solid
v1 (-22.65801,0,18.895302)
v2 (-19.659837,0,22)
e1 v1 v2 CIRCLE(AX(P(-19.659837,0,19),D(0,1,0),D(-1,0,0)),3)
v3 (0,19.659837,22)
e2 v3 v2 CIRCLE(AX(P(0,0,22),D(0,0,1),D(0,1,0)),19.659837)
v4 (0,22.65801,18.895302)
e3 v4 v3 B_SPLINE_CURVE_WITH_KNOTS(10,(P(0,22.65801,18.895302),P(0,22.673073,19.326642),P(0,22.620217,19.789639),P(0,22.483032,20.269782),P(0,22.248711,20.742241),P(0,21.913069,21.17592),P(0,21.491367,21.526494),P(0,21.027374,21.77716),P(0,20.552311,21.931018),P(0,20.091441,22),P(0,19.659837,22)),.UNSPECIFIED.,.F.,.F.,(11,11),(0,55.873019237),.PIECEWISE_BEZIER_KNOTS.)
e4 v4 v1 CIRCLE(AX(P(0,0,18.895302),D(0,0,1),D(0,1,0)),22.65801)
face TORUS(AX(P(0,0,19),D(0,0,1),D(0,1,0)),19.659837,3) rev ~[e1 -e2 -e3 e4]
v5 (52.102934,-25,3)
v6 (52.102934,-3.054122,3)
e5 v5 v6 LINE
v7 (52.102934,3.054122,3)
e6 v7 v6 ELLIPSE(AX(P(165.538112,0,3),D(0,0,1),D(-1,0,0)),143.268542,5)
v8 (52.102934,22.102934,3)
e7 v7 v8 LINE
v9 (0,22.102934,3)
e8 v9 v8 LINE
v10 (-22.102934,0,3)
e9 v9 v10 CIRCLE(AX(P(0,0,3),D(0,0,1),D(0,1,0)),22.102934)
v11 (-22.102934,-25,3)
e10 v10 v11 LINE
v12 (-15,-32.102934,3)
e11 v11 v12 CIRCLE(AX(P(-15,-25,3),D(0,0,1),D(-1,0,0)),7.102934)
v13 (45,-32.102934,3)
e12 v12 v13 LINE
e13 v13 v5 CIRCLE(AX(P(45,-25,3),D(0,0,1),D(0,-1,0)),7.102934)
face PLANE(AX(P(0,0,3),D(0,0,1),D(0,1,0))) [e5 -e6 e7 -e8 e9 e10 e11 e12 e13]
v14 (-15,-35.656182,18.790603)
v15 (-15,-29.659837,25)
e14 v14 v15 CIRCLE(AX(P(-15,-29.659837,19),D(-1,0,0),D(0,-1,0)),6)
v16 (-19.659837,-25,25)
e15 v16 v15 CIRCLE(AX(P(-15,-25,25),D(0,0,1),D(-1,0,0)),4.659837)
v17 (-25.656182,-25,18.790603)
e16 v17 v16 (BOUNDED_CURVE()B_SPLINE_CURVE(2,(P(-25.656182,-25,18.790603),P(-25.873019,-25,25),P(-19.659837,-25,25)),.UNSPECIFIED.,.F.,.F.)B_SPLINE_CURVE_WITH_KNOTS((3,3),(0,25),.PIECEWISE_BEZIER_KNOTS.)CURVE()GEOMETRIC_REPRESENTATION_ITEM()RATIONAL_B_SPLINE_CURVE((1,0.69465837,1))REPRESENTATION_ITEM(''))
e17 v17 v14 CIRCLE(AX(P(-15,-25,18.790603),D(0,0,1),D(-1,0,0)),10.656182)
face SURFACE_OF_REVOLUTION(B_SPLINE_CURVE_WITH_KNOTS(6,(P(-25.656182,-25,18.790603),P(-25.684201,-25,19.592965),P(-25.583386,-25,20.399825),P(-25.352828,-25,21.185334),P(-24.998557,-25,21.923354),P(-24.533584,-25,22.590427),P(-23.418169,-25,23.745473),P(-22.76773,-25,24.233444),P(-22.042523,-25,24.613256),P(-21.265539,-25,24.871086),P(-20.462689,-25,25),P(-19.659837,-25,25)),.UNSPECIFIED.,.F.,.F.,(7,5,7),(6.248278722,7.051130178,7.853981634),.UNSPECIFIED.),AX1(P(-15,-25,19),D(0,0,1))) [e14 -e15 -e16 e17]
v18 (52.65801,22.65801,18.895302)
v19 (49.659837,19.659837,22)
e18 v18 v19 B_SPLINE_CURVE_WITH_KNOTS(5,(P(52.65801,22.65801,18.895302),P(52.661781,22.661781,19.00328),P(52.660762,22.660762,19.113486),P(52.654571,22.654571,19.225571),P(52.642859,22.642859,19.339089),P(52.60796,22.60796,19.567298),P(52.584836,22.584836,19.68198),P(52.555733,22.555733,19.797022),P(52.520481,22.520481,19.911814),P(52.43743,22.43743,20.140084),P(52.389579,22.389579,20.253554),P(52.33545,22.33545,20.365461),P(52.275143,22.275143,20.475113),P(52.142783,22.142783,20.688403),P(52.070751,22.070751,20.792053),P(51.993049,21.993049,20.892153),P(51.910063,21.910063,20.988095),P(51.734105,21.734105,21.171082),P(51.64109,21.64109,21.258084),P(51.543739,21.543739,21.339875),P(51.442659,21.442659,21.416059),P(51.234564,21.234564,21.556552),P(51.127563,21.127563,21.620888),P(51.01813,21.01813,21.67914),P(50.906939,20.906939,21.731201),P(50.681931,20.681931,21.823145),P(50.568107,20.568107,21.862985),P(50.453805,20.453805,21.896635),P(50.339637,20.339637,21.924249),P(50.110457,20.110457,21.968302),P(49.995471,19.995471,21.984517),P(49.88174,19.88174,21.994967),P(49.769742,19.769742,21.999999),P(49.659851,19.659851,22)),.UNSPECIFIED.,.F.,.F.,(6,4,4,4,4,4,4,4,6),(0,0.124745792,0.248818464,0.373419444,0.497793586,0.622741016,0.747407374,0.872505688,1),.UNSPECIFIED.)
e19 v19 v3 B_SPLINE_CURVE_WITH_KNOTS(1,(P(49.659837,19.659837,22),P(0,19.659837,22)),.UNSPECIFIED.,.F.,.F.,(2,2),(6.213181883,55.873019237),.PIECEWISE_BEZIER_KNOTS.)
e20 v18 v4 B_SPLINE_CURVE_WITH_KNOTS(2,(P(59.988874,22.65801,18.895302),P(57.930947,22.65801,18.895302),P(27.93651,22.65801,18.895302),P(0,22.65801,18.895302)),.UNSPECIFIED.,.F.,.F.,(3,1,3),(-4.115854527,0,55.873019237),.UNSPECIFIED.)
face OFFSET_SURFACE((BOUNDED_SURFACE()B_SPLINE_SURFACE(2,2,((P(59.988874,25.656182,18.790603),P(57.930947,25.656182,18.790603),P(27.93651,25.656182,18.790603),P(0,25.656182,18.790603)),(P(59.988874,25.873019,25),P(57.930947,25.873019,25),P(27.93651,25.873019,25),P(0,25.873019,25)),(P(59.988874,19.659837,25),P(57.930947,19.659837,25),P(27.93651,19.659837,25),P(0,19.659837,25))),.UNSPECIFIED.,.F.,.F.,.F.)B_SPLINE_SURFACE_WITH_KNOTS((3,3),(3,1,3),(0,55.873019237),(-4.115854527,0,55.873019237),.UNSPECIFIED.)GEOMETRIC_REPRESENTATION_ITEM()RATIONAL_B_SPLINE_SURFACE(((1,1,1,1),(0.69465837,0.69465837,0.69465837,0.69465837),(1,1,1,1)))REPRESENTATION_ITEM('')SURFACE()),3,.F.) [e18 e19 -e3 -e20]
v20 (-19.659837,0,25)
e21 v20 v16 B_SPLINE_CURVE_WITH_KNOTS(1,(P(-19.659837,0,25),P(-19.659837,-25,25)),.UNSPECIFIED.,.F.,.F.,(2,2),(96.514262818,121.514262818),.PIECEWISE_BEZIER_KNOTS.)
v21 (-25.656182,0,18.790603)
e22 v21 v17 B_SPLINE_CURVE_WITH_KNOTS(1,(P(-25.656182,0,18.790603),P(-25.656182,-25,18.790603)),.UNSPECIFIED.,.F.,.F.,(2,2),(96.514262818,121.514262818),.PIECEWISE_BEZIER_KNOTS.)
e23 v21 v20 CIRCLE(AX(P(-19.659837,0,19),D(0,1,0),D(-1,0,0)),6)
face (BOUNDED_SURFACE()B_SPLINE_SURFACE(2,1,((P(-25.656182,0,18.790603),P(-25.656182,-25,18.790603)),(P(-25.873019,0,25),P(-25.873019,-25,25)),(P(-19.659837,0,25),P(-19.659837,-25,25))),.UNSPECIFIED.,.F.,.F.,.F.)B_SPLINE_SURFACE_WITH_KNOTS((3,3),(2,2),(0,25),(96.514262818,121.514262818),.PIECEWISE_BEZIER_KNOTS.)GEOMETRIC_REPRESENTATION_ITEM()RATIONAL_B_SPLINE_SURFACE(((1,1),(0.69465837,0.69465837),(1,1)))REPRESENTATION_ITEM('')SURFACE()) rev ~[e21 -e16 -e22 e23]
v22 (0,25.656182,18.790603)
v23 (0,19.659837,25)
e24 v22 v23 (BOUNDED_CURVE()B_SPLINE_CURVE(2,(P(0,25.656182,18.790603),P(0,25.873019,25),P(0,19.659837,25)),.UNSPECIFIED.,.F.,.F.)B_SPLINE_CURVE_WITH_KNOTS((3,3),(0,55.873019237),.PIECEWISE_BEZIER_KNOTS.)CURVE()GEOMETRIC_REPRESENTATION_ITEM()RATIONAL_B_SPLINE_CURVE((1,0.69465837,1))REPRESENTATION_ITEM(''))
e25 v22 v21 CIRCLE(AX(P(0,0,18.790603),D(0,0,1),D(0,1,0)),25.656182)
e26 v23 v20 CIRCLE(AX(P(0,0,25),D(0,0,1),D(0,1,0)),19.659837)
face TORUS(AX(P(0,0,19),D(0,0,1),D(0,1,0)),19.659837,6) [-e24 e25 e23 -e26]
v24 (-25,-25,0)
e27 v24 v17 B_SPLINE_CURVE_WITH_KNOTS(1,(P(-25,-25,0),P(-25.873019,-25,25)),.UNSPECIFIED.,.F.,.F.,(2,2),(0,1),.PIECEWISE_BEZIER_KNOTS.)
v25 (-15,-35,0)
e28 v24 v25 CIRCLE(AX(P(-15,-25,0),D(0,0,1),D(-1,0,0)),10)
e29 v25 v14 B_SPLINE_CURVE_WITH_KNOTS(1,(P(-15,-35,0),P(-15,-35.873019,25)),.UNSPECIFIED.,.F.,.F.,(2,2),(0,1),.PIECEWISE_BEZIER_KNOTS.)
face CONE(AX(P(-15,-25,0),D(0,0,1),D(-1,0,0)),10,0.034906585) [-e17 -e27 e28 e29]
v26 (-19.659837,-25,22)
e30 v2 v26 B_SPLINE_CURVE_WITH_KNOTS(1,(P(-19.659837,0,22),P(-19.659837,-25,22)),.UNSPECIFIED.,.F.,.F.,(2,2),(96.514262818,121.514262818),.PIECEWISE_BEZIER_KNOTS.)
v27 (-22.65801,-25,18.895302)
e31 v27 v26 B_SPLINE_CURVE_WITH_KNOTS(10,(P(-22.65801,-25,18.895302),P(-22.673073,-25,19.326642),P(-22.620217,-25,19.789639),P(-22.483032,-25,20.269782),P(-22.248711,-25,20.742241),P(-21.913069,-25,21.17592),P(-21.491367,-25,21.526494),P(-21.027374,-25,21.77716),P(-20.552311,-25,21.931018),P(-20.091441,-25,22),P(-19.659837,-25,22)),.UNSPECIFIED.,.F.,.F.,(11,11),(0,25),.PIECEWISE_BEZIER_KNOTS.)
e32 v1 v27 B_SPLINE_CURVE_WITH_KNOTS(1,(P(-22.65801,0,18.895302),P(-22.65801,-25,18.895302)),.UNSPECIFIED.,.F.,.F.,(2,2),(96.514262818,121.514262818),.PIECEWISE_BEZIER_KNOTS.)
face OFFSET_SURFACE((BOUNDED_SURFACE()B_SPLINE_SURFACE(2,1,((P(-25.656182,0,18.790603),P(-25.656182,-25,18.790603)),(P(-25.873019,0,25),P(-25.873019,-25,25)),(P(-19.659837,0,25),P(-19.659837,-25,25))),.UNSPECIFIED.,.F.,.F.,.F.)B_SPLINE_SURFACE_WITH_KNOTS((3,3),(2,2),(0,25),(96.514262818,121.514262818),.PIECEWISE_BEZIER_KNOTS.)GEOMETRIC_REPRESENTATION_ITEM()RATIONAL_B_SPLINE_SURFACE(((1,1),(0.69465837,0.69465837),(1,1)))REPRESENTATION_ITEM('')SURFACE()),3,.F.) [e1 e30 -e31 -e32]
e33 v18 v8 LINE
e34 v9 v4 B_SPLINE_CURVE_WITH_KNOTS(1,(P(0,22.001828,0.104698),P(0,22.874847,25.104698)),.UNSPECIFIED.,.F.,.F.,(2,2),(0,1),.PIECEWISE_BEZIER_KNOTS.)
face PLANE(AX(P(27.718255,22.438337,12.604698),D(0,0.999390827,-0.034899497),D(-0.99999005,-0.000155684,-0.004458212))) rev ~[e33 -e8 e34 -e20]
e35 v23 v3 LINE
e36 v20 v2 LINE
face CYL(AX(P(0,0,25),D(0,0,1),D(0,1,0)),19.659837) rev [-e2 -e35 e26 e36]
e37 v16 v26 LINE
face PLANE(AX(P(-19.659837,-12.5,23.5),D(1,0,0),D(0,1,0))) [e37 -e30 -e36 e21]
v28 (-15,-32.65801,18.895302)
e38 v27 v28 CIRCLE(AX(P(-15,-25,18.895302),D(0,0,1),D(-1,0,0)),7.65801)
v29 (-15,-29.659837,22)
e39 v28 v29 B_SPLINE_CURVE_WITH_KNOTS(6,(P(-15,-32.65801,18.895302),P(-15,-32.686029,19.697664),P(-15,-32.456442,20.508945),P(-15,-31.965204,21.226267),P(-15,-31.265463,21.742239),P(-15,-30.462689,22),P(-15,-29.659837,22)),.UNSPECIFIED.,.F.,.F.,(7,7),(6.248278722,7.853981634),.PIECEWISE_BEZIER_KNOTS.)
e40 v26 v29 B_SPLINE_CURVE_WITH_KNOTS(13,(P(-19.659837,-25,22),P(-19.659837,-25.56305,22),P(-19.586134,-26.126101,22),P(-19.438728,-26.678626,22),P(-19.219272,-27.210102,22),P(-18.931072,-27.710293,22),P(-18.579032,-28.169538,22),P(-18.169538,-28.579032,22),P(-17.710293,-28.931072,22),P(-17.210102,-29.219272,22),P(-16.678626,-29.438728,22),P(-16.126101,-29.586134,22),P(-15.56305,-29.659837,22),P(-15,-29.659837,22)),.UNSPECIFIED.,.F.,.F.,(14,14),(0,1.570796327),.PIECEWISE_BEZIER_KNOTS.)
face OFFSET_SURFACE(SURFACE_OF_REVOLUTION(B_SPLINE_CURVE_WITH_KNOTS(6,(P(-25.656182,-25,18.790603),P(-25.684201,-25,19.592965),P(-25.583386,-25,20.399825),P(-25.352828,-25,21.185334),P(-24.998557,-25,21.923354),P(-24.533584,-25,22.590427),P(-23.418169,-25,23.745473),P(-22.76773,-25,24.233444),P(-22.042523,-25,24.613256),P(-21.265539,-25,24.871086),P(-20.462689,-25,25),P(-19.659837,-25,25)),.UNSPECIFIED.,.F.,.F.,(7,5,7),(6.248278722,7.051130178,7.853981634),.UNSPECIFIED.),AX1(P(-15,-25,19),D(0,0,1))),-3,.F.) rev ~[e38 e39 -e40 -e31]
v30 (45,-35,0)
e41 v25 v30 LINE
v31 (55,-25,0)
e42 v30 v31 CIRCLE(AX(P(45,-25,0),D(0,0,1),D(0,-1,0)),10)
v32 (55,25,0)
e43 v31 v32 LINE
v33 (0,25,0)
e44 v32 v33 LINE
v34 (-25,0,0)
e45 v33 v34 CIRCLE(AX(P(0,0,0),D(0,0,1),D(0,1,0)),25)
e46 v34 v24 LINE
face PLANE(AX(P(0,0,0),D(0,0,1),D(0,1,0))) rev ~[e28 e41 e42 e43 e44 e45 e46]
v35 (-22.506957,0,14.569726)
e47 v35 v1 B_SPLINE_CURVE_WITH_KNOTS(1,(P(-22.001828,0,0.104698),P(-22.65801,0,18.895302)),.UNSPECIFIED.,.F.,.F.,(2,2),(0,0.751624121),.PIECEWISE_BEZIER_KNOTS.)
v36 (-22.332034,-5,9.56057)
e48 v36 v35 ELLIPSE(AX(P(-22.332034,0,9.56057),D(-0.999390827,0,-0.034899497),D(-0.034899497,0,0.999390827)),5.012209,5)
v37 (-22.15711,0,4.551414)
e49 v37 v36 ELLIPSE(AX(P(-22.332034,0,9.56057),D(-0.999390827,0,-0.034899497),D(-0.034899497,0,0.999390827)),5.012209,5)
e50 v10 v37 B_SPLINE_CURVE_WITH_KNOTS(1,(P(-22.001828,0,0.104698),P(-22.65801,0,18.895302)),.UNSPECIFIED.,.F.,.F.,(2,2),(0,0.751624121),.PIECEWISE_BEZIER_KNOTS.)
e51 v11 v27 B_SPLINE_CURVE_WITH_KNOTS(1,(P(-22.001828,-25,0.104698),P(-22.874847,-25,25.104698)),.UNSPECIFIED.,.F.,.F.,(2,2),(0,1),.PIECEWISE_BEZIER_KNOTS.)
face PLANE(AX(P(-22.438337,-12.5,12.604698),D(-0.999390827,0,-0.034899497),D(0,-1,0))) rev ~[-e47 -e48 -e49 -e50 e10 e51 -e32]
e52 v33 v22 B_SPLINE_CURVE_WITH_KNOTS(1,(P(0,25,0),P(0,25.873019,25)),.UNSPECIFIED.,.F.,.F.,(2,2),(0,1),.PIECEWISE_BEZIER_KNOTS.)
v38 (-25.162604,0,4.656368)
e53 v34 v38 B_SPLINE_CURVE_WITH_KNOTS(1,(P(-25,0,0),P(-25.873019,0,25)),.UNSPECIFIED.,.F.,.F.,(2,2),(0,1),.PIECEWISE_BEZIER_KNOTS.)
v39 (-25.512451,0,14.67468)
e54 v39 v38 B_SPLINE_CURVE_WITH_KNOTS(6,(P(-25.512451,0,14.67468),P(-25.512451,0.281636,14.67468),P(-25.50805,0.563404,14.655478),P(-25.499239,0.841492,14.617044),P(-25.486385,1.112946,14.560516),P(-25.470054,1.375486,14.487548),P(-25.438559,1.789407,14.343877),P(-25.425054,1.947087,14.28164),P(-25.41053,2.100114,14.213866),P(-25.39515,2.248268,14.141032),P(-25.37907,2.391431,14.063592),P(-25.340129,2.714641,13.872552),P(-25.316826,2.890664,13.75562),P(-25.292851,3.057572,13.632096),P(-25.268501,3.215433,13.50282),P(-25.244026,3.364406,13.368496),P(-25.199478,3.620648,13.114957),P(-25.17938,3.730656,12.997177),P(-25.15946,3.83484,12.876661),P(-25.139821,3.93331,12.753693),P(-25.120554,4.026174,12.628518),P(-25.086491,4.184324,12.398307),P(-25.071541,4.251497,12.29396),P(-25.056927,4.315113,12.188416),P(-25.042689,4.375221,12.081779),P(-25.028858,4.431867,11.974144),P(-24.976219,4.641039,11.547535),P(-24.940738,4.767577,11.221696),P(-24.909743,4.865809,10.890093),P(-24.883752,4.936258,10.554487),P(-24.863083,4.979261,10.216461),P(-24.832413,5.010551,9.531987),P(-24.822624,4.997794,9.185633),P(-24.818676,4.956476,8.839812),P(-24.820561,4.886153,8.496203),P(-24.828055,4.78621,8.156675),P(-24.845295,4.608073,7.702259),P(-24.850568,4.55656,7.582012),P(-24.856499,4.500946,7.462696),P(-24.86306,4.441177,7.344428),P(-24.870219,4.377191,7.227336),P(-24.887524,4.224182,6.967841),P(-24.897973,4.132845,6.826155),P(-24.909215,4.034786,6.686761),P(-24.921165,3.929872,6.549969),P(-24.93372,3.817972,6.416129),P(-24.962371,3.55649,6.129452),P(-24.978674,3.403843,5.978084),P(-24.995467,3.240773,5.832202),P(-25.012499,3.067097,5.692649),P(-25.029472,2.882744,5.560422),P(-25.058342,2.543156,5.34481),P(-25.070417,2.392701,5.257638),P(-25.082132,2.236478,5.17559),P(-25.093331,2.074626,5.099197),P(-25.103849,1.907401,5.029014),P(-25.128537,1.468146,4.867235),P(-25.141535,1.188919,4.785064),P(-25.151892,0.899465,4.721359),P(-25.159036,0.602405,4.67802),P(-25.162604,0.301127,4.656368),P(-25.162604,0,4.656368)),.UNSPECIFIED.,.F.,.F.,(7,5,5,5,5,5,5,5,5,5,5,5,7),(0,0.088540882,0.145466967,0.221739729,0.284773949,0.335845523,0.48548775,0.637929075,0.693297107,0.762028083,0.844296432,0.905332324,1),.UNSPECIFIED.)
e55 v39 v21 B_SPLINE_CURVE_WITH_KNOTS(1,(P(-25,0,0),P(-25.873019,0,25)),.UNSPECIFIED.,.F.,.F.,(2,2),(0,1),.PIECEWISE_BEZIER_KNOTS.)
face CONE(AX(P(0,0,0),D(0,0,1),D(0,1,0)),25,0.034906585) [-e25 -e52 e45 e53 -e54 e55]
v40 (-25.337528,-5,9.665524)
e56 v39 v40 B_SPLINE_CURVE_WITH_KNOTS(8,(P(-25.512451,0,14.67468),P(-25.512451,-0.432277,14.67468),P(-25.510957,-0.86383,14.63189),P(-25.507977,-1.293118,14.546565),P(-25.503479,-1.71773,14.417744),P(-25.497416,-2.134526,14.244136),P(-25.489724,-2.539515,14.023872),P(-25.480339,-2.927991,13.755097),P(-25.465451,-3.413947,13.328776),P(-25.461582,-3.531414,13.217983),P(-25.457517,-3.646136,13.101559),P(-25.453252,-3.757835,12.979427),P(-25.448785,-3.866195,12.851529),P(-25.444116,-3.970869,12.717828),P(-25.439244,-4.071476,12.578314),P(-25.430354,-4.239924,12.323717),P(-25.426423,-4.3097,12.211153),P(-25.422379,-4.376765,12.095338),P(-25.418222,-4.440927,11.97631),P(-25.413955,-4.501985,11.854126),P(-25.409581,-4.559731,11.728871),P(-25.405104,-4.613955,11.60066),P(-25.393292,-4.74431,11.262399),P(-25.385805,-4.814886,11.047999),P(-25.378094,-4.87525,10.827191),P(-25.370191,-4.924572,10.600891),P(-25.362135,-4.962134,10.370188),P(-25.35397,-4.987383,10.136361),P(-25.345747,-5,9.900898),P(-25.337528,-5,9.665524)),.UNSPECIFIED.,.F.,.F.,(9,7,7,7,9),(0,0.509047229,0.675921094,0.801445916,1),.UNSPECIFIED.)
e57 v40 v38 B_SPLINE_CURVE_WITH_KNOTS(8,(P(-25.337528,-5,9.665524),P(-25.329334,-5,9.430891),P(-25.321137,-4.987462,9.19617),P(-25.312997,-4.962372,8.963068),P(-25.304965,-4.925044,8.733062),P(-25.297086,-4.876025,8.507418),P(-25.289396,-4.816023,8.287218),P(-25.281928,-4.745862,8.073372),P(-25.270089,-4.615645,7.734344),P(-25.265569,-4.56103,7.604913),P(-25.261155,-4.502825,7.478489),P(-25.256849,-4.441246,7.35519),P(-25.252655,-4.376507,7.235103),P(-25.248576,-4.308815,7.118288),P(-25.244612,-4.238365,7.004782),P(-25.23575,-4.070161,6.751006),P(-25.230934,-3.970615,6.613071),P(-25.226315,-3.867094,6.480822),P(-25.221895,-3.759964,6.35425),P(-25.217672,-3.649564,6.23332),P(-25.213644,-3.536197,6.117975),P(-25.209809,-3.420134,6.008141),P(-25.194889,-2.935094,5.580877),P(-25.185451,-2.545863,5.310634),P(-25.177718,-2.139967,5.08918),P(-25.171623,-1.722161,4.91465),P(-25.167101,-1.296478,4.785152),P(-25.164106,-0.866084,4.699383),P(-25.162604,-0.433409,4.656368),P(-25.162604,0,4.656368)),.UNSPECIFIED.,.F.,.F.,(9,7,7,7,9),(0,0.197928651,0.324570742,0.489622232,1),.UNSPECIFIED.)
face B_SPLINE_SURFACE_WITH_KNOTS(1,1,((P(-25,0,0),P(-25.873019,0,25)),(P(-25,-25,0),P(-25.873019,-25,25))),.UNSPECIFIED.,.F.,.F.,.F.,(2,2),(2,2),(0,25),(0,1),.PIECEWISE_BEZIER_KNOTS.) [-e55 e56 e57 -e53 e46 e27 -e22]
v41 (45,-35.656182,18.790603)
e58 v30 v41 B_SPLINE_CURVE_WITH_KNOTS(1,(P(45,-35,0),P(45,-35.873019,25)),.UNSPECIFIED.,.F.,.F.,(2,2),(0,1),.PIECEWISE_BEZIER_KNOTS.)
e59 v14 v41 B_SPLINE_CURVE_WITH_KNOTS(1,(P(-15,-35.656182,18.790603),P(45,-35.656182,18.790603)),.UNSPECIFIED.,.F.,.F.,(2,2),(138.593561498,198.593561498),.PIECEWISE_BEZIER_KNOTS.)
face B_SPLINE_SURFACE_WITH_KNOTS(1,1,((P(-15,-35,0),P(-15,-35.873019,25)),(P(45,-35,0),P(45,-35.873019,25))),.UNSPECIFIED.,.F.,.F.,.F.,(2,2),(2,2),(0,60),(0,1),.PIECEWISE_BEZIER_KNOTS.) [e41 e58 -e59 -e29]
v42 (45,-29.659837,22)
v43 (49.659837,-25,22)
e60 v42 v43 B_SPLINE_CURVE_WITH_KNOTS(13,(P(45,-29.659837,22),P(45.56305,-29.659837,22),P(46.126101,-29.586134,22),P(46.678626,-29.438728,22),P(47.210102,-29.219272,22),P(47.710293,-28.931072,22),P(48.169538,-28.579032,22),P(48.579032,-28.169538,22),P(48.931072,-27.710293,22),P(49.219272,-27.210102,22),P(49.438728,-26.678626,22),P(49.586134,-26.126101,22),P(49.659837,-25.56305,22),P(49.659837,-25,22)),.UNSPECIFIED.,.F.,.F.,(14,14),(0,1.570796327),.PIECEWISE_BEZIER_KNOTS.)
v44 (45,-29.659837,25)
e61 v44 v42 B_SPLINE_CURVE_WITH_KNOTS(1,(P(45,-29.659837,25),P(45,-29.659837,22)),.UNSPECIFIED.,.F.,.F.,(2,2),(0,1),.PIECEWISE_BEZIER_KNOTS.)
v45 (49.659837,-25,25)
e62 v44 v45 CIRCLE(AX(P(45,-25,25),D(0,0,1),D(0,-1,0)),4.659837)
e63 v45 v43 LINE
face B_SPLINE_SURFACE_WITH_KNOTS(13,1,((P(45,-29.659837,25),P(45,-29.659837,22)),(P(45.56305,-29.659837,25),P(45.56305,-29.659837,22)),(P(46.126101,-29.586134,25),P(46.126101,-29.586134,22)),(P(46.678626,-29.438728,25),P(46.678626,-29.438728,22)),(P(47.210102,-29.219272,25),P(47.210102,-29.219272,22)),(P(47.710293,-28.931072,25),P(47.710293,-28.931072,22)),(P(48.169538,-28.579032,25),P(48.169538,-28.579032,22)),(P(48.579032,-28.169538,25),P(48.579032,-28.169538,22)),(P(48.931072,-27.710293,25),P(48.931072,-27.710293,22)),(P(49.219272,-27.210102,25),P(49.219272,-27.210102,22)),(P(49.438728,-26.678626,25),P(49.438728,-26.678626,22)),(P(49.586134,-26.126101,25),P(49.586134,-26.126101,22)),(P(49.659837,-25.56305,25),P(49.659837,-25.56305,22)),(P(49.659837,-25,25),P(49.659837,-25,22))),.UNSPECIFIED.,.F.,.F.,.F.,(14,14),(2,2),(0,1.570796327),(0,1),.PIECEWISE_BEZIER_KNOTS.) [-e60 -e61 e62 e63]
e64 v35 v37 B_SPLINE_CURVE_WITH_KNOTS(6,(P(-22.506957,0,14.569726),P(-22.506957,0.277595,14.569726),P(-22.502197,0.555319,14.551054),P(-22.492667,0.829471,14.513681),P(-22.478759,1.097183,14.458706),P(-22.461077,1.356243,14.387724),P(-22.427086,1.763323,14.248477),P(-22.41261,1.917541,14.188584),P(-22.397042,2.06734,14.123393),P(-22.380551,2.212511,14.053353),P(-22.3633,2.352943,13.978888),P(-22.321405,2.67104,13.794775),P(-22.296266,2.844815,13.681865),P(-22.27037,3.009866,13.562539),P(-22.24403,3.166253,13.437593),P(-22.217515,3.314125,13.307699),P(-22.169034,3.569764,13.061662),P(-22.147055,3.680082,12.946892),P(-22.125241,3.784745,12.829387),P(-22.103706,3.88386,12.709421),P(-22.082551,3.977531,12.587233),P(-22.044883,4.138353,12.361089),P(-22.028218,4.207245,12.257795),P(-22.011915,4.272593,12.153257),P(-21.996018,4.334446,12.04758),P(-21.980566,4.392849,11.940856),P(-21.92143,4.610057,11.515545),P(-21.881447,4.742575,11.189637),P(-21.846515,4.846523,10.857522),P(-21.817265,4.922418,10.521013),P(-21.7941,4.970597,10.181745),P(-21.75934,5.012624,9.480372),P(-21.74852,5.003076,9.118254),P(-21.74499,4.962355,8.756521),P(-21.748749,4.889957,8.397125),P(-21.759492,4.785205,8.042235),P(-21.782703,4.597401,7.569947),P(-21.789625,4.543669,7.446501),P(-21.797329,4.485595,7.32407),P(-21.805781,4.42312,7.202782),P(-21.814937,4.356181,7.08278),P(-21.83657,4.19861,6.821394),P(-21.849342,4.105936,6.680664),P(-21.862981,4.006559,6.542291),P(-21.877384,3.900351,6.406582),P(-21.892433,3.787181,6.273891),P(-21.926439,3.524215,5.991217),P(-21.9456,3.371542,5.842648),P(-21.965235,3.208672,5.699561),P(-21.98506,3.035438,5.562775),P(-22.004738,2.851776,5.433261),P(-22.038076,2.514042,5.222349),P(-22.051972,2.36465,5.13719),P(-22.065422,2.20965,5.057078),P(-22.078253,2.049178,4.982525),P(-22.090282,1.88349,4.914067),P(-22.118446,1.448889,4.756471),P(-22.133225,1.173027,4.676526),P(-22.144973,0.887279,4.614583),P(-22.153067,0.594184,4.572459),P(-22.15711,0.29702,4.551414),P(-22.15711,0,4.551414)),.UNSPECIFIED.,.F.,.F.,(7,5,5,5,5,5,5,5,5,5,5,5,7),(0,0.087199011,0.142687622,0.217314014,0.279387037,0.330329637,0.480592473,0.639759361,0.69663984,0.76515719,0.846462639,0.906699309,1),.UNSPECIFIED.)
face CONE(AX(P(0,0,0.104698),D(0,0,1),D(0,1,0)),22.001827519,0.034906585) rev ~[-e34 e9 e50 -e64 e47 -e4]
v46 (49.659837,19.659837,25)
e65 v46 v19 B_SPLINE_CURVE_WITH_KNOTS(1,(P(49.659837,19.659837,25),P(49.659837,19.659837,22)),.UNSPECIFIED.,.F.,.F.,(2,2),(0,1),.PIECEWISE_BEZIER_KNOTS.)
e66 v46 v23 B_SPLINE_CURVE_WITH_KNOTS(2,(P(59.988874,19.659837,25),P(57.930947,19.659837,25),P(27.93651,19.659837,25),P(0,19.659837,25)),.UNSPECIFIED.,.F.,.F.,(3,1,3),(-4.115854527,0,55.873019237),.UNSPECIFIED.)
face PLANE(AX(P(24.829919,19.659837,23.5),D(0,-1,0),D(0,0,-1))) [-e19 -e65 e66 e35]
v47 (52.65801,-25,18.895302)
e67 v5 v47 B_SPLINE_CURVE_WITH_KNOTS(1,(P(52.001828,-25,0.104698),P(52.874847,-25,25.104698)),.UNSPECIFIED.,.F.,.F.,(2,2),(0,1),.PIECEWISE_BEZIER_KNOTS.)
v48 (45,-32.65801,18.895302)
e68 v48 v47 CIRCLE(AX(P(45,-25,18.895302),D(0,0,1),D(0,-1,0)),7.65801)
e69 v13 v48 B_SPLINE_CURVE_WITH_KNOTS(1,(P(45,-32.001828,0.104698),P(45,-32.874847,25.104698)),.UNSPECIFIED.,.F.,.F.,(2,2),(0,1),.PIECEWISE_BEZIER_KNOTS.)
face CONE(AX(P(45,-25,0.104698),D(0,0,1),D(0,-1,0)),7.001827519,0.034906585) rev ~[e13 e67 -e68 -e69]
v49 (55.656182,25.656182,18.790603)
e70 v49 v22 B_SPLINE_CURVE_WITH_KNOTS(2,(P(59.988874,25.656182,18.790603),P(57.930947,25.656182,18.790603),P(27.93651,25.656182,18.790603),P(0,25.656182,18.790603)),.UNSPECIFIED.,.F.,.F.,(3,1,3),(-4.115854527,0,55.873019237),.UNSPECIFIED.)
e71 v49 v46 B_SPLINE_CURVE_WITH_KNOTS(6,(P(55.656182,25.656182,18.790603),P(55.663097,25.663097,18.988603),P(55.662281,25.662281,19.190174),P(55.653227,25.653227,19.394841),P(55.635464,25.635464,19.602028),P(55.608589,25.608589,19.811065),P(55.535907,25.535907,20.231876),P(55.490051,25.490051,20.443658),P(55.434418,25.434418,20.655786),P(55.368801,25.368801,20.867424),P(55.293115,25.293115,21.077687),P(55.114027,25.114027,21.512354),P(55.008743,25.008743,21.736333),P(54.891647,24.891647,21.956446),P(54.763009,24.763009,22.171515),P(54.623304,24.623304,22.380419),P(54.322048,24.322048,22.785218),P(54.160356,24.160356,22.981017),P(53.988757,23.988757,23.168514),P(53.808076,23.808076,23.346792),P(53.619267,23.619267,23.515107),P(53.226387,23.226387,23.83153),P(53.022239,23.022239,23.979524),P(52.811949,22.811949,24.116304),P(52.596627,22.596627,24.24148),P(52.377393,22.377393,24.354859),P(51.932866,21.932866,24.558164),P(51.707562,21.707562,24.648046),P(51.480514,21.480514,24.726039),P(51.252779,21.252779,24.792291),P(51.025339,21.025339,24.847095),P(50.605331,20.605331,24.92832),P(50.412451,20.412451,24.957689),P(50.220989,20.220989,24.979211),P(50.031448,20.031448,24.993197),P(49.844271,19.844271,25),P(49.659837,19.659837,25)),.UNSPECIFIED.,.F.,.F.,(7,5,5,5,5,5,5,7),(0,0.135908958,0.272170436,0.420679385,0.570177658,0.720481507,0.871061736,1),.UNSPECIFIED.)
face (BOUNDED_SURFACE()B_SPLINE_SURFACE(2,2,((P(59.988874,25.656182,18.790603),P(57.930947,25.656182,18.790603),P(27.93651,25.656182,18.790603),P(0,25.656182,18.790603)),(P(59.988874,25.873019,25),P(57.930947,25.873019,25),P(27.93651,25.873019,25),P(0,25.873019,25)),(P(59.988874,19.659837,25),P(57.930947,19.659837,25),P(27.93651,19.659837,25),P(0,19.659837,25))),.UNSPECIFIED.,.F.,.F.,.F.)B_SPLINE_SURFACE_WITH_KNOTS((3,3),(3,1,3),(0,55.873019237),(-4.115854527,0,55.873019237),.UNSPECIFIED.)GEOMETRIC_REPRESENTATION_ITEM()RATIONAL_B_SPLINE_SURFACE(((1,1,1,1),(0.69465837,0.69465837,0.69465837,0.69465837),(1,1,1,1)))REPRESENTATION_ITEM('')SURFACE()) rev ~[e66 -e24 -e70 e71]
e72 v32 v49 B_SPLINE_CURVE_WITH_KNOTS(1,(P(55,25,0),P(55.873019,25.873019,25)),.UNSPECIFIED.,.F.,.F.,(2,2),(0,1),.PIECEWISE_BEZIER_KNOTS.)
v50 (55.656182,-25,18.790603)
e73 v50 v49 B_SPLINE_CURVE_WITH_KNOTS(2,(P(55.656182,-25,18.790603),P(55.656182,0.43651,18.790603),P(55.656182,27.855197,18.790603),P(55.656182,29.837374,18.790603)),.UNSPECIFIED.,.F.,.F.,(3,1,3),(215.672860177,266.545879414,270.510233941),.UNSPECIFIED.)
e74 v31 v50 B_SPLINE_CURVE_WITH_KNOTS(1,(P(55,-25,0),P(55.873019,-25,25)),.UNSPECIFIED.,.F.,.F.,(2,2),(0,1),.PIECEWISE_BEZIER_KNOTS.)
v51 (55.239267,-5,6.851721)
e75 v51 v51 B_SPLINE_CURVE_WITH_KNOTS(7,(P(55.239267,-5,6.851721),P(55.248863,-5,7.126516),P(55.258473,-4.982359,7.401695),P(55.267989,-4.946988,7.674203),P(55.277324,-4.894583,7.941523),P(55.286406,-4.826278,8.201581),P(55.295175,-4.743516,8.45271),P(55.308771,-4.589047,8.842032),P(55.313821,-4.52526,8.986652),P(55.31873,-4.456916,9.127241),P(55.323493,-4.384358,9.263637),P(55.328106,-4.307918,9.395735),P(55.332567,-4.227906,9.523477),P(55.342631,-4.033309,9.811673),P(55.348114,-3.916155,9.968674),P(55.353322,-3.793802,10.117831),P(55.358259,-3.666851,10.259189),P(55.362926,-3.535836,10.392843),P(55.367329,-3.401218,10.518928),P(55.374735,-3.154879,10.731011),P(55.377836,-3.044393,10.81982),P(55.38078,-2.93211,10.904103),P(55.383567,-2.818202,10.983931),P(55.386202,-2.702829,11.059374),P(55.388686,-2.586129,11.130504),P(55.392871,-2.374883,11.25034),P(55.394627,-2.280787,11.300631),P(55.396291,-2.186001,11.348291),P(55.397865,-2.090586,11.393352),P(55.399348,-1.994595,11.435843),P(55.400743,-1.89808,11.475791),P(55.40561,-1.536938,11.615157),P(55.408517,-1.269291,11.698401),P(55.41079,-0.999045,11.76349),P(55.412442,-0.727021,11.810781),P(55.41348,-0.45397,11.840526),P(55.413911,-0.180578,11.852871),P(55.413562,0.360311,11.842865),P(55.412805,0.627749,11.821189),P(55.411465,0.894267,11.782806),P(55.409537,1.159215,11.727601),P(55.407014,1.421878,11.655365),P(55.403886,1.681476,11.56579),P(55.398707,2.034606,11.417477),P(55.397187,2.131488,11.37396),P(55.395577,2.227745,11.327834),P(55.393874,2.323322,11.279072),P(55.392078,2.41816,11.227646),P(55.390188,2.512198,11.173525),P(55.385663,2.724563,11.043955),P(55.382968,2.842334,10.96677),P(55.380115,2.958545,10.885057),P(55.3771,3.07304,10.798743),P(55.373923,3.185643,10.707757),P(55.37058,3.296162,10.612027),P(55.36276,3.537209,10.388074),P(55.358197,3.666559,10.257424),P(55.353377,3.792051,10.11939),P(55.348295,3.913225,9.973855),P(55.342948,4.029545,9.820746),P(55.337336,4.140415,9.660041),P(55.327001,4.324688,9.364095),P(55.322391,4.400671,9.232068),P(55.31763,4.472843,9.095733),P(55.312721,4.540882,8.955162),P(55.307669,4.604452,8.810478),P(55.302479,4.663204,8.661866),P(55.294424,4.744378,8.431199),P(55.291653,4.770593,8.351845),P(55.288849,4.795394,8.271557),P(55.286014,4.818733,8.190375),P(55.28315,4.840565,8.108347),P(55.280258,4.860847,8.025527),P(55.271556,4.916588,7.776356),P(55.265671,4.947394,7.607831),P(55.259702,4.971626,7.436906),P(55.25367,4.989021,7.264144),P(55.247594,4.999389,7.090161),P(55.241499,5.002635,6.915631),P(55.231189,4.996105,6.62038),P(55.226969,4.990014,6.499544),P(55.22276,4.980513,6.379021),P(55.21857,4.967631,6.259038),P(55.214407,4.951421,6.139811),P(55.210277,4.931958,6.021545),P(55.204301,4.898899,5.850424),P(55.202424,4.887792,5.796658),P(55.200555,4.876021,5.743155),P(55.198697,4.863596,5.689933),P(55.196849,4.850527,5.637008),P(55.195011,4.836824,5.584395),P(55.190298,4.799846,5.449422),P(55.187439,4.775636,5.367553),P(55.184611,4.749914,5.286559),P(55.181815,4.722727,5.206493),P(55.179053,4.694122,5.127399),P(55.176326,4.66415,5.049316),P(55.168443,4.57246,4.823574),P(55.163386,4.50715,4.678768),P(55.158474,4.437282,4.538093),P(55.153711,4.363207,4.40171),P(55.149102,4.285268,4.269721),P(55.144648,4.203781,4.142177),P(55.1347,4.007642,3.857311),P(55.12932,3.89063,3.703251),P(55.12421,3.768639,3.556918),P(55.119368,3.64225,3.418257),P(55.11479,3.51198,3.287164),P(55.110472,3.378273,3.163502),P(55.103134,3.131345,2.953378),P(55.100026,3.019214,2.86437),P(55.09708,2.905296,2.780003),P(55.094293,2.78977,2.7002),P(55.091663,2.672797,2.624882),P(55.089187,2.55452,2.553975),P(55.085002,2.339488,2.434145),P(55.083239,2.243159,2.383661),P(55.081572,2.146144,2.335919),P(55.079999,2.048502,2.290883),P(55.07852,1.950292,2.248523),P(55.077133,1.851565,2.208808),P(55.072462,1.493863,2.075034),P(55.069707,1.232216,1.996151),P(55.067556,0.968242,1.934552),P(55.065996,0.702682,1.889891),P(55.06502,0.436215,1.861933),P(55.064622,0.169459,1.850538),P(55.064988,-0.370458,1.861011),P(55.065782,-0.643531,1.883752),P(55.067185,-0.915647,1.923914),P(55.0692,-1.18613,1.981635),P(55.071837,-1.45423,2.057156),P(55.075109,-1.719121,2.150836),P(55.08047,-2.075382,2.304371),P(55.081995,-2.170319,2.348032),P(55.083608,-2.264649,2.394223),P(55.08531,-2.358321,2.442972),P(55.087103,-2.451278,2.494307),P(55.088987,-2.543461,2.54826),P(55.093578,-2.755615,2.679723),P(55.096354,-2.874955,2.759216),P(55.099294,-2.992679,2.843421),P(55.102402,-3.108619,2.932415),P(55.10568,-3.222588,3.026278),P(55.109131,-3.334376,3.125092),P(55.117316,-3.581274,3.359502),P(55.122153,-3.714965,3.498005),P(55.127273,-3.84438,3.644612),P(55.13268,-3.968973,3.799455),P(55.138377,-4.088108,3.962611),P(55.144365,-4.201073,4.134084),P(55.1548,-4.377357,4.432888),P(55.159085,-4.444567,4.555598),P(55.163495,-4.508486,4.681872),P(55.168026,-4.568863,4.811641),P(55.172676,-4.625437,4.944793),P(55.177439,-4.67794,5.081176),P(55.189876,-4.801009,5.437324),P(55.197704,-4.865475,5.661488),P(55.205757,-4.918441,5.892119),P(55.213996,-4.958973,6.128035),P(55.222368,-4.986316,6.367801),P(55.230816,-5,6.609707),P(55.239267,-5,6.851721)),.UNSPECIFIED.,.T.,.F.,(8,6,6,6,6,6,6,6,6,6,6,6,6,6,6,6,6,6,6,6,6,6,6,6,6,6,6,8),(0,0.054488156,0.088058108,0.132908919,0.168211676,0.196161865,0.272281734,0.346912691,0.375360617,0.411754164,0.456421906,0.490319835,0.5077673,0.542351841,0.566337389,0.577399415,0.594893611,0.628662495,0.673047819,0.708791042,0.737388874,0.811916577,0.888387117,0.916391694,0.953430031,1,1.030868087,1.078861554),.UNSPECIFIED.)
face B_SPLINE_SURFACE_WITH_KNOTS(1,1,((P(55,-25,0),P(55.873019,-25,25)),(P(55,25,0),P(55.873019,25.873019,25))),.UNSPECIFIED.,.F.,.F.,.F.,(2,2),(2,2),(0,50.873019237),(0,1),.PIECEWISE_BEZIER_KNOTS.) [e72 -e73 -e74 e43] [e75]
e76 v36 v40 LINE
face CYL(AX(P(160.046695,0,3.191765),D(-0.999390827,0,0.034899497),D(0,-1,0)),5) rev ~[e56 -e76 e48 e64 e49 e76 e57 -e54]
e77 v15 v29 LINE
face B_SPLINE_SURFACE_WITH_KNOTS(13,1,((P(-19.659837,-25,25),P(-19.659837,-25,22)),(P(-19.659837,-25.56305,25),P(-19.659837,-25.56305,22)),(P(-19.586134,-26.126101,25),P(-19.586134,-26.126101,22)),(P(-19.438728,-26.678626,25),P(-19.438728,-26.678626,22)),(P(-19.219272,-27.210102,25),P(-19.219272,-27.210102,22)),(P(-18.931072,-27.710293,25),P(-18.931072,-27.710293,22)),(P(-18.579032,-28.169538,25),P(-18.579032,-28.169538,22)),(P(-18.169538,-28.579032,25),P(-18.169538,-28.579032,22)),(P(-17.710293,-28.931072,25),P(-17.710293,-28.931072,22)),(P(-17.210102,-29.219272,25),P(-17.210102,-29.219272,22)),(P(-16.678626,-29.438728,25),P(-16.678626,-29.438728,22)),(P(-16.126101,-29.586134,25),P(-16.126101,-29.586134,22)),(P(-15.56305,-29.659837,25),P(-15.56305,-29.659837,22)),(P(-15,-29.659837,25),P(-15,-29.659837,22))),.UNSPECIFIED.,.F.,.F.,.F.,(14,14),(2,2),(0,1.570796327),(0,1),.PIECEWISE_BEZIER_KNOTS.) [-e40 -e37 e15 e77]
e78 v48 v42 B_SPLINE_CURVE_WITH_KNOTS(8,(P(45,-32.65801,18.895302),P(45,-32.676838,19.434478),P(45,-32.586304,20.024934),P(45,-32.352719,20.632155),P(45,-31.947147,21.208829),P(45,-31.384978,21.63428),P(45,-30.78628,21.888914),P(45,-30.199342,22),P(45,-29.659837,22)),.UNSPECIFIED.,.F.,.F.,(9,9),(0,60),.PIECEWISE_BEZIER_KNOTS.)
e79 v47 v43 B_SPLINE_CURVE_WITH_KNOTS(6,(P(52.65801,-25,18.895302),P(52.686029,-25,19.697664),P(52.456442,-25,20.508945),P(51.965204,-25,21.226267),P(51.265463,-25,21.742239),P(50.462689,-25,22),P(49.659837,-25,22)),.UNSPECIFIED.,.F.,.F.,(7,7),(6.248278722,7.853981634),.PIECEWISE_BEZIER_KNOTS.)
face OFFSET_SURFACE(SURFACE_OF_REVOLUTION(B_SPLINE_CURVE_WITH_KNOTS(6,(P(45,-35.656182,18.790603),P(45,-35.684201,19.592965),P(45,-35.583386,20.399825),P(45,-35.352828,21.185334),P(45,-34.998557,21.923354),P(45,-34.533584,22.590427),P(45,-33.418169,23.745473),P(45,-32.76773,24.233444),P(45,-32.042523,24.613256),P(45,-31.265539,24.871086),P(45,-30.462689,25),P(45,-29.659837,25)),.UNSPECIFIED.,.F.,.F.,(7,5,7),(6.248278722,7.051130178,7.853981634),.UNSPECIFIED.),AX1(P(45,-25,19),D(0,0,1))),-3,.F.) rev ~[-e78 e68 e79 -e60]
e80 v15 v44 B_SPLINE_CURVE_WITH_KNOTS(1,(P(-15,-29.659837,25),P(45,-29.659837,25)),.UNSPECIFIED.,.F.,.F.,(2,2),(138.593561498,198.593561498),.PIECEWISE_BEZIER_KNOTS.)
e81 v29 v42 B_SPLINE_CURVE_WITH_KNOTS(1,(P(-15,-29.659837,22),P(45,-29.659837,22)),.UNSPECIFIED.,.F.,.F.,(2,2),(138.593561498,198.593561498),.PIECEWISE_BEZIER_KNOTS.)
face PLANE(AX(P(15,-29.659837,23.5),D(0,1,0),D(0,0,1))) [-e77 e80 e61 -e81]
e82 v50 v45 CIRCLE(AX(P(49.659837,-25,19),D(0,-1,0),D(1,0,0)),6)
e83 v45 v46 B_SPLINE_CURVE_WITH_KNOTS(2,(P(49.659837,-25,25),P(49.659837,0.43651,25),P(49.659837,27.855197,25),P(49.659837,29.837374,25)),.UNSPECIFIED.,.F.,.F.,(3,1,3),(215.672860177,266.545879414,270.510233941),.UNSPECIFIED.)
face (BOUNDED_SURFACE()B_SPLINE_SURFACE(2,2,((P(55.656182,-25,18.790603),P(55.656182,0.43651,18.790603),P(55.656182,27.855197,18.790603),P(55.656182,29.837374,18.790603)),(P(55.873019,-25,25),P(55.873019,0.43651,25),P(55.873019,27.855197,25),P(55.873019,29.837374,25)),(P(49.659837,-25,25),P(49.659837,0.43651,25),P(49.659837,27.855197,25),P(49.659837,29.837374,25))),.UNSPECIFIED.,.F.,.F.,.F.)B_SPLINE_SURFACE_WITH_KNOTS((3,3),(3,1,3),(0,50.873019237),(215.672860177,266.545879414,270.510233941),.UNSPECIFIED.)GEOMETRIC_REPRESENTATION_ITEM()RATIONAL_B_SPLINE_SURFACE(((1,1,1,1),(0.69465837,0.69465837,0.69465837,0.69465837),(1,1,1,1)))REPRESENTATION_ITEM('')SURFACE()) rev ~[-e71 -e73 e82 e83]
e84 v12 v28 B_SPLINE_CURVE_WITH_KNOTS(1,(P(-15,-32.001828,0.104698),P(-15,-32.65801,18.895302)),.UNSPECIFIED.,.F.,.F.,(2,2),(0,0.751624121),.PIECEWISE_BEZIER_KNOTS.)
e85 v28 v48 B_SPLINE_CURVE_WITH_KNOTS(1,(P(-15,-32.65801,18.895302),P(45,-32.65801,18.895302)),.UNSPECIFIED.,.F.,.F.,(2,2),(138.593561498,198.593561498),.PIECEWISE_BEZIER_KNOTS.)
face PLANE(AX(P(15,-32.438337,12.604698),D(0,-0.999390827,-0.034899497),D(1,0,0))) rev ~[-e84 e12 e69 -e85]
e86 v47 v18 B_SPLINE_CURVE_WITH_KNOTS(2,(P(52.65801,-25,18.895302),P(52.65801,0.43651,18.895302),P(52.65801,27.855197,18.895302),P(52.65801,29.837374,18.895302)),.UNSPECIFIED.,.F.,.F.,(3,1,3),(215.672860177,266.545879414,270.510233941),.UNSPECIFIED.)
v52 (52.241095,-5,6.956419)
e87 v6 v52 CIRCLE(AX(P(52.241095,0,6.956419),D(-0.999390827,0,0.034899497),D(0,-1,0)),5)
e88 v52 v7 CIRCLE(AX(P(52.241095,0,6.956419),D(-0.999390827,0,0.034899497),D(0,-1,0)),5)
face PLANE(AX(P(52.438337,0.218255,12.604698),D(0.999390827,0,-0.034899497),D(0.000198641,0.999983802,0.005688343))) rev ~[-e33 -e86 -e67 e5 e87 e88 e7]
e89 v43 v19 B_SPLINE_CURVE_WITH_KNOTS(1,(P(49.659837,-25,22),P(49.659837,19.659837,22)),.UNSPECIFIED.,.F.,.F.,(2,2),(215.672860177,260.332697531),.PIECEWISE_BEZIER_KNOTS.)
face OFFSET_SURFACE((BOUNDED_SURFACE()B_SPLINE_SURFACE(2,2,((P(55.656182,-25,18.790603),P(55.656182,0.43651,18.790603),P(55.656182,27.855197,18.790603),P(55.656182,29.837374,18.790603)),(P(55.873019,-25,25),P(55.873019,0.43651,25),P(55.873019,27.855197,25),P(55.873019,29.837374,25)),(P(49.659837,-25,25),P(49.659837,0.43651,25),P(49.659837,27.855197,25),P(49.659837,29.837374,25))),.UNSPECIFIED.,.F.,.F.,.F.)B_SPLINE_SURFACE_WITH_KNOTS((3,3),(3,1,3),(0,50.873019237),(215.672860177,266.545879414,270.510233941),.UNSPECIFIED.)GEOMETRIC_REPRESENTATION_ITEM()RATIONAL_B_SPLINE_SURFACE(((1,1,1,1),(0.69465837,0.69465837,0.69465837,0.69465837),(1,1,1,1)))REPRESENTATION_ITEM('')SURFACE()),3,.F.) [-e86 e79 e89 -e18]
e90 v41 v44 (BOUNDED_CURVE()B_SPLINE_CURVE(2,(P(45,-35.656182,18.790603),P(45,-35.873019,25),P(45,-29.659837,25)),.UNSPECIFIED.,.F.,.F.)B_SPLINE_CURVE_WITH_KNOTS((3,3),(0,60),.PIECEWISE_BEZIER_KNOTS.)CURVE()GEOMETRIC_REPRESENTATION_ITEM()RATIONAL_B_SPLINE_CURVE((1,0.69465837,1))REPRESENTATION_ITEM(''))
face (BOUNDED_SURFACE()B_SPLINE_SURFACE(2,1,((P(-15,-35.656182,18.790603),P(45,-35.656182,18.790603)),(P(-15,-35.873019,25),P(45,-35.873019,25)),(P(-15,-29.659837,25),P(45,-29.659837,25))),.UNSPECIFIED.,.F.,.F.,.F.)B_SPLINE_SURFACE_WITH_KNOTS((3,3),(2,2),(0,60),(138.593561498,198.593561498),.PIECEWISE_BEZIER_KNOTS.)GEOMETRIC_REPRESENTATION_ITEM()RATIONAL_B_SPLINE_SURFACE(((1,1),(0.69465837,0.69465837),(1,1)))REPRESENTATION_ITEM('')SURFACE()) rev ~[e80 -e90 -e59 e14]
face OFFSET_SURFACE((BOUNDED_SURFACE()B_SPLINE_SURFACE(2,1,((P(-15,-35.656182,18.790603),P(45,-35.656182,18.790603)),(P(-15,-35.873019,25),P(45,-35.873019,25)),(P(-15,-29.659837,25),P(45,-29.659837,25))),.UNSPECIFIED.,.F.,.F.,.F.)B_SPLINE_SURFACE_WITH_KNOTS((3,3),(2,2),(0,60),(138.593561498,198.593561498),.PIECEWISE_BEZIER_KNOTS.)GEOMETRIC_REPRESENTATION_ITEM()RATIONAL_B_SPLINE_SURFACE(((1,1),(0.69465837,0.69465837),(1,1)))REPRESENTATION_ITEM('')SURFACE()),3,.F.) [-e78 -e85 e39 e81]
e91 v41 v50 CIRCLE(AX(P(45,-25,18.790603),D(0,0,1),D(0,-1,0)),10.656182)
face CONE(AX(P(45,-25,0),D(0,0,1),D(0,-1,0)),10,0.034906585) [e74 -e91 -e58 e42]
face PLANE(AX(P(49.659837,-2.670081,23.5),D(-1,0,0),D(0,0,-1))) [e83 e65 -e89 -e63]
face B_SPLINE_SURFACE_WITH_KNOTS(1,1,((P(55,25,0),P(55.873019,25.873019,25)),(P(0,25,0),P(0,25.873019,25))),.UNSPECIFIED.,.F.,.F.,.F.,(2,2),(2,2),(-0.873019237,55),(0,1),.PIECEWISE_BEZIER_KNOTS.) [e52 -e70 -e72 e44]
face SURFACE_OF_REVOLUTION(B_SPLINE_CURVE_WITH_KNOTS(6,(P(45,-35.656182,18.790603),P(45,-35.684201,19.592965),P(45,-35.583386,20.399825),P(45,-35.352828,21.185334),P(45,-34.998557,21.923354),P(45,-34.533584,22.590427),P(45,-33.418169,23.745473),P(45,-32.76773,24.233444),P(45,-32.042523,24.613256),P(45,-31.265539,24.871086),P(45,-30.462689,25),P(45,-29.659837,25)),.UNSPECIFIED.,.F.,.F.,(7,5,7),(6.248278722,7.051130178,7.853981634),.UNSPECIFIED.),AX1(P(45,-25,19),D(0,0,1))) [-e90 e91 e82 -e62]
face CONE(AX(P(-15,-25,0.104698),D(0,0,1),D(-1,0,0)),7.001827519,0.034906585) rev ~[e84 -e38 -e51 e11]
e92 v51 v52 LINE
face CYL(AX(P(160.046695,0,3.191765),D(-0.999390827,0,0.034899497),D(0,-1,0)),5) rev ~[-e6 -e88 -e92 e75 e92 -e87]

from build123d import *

# Parameters (mm, degrees)
F1_DEPTH = 25
F1_TAPER = -2
F2_R     = 6
F3_T     = 3
F5_D     = 10


# Not quite as in the source:
# - a shell that OpenCascade refuses in one call is made with other operations: the cavity is built on its own and cut out


with BuildPart() as f1:
    # F0 (on Top) → F1 (new body)
    with BuildSketch(Plane.XY):
        with BuildLine():
            Line((55, 25), (0, 25))
            ThreePointArc((0, 25), (-17.6776695297, 17.6776695297), (-25, 0))
            Line((-25, 0), (-25, -25))
            ThreePointArc((-25, -25), (-22.0710678119, -32.0710678119), (-15, -35))
            Line((-15, -35), (45, -35))
            ThreePointArc((45, -35), (52.0710678119, -32.0710678119), (55, -25))
            Line((55, -25), (55, 25))
        make_face()
    extrude(amount=F1_DEPTH, taper=F1_TAPER)

    # F2
    f2_edges = [f1.edges().sort_by_distance(p)[0] for p in [
        (15, -35.873019, 25),
    ]]
    fillet(f2_edges, radius=F2_R)

    # F3: shell of thickness 3, made by hand


with BuildPart() as f3_core1:
    # F3_t2: copy of F1
    add(f1.part)

    # the walls: a layer under each face that stays
    f3_faces = [f3_core1.faces().sort_by_distance(p)[0] for p in [
        (27.6640479465, 25.328095893, 9.3954370929),
        (-17.9096696286, 17.9096696286, 9.395488449),
        (27.794131329, 23.9760199568, 23.1679440438),
        (15, -5, 0),
        (55.3280962996, 0.1640481498, 9.3954487356),
        (-25.3280911583, -12.5, 9.3953015099),
        (-16.9638078754, 16.9431979233, 23.1679501064),
        (53.9760549891, 0.2869115749, 23.1679425379),
        (-22.3030632948, -32.3030632948, 9.3953015099),
        (15, -35.3280911583, 9.3953015099),
        (52.3030694739, -32.3030694739, 9.3955517523),
        (-23.9758761566, -12.5, 23.1679502228),
        (51.3377505062, -31.3560472609, 23.1679500628),
        (15, -33.9758761566, 23.1679502228),
        (-21.3469028974, -31.3469028974, 23.1679502228),
    ]]
    thicken(f3_faces, amount=-F3_T, mode=Mode.SUBTRACT)


with BuildPart() as f1_1:
    add(f1.part)

    # what is left inside the walls is the cavity
    f3_cavity = [f3_core1.part.solids().sort_by_distance(p)[0] for p in [
        (27.367645, -5, 3.03),
    ]]
    add(f3_cavity, mode=Mode.SUBTRACT)

    # F5 (through all)
    with Locations(Plane(origin=(54.9330113821, 0, -1.918303028), x_dir=(0, 1, 0), z_dir=(0.999390827, 0, -0.0348994967))):
        with Locations((0, 8.7753692642)):
            Hole(F5_D / 2)


solid = f1_1.part
